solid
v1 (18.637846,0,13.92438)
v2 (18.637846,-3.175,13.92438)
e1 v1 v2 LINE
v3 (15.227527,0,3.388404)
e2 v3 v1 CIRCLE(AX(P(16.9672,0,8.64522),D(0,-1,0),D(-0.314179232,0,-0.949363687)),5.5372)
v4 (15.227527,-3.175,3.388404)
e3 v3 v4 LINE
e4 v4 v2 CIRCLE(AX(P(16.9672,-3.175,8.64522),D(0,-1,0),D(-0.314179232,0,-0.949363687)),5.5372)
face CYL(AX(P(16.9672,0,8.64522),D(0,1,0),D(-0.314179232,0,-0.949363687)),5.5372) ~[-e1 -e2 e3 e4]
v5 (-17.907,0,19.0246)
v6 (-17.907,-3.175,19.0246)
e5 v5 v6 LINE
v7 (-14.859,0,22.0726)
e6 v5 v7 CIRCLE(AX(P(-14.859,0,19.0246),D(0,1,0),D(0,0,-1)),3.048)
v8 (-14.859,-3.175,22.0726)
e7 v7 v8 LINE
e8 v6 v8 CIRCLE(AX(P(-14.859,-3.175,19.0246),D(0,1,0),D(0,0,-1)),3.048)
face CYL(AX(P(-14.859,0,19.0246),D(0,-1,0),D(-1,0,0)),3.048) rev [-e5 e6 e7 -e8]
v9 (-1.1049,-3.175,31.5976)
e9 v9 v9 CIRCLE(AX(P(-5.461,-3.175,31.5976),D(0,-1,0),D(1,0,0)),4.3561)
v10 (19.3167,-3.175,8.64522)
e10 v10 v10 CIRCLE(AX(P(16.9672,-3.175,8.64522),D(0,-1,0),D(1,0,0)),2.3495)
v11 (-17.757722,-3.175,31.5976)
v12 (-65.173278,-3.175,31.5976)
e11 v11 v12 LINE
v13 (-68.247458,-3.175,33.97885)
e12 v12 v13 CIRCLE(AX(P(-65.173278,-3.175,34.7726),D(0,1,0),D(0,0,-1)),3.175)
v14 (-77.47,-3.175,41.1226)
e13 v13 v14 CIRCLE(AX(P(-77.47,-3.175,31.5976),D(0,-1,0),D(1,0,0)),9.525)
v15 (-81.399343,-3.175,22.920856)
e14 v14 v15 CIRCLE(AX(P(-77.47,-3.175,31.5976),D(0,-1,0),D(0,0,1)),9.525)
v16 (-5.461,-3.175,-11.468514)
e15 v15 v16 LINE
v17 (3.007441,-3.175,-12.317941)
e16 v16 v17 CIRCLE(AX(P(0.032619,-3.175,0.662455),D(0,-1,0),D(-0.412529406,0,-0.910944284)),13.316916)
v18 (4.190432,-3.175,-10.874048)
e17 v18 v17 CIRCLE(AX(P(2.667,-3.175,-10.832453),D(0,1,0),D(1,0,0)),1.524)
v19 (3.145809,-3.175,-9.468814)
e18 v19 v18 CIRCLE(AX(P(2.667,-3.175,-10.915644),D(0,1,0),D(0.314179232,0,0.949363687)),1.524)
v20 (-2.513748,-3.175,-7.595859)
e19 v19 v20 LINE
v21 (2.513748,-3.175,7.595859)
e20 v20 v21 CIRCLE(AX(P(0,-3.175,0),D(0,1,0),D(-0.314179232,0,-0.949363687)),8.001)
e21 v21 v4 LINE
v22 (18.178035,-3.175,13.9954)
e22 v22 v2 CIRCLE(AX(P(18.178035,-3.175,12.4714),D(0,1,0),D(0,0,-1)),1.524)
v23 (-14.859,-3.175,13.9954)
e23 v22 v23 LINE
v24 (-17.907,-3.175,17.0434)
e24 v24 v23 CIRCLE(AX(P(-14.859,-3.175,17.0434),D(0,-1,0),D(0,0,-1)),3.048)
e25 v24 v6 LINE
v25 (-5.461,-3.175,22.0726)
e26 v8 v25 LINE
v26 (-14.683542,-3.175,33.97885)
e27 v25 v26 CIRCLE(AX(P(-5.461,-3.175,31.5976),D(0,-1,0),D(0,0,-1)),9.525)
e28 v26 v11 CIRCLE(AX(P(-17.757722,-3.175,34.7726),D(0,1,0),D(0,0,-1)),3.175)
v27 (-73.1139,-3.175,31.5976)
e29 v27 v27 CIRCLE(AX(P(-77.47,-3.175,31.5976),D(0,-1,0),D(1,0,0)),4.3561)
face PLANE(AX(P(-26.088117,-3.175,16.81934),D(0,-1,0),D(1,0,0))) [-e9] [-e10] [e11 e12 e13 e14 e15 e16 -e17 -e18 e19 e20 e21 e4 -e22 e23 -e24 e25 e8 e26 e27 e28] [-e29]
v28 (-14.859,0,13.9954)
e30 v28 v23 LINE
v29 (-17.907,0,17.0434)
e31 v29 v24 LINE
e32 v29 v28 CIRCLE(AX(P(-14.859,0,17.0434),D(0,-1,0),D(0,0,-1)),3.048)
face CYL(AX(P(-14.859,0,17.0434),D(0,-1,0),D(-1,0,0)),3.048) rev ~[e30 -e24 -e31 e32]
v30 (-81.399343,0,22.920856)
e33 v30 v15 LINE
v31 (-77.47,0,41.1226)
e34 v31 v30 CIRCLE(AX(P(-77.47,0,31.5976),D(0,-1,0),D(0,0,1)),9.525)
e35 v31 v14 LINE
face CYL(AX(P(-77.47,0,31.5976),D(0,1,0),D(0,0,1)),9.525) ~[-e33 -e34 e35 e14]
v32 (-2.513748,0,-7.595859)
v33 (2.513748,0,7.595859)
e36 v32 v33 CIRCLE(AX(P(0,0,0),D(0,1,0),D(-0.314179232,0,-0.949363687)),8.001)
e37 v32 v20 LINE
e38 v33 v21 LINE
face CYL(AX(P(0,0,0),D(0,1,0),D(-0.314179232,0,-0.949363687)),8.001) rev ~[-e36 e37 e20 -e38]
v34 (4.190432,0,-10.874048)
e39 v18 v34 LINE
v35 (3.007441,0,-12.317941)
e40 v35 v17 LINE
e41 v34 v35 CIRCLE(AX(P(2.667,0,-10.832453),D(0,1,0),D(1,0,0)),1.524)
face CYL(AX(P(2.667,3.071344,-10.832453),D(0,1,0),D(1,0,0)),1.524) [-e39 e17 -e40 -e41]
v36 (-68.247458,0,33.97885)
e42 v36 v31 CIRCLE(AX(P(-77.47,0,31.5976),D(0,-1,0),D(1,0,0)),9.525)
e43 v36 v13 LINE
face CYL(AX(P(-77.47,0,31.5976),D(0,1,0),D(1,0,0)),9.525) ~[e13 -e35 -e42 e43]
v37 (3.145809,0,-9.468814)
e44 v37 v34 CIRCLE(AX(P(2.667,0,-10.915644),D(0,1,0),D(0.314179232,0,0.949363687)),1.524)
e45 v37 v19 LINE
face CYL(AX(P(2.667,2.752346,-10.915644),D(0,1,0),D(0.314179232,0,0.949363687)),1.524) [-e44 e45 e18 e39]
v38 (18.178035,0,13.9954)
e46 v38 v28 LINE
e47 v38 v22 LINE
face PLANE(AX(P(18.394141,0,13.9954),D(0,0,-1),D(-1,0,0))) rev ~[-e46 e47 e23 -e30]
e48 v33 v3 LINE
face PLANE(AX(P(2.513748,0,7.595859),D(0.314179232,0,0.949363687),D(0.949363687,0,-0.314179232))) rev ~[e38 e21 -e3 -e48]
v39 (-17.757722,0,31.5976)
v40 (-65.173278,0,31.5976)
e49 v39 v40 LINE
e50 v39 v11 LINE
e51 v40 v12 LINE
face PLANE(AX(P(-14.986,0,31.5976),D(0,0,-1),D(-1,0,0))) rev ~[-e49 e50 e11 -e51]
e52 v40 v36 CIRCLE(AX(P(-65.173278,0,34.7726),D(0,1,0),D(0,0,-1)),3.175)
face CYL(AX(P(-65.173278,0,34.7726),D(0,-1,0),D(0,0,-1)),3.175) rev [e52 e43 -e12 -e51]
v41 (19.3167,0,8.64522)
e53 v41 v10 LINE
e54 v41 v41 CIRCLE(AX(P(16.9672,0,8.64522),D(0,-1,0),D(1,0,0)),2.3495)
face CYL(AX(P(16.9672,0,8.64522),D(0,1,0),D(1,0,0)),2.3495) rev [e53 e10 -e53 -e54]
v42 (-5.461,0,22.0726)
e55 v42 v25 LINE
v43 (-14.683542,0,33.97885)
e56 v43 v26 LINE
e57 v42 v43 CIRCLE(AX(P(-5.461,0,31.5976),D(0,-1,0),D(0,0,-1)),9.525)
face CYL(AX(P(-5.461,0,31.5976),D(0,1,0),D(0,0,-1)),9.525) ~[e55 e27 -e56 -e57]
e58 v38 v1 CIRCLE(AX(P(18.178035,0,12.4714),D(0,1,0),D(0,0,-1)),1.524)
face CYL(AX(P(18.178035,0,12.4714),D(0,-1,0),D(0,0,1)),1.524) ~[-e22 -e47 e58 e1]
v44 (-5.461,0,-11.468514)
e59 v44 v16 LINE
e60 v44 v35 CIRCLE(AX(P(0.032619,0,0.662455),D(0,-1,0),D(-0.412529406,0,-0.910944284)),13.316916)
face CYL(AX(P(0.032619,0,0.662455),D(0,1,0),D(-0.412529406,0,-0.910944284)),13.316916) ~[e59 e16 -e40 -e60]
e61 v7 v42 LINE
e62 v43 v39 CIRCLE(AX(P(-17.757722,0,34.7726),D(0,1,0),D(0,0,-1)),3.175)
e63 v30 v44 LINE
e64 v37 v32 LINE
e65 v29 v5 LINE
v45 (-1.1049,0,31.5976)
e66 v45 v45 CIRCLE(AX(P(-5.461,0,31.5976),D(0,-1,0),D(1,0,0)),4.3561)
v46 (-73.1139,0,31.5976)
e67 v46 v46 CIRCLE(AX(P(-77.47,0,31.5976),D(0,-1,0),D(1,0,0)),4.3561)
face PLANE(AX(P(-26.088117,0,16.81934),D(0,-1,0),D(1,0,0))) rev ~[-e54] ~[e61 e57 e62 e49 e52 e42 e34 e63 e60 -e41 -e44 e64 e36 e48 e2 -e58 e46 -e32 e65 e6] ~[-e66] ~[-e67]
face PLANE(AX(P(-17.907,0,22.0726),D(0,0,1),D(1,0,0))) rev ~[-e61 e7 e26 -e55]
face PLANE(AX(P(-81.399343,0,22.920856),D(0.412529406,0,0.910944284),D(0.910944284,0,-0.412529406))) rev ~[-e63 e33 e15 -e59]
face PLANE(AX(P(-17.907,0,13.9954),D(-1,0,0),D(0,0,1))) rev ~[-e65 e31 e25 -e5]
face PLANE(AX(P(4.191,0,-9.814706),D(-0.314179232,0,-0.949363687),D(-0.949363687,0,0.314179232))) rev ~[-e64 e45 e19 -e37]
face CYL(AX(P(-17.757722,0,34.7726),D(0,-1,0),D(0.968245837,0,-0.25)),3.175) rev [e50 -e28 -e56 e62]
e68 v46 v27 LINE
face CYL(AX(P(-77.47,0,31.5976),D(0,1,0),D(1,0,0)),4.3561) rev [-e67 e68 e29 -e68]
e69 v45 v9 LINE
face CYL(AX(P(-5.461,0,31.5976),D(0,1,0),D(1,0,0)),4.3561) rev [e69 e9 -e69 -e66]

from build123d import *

# Parameters (mm, degrees)
F0_R        = 2.3495
F0_R_2      = 4.3561
F1_DEPTH    = 3.175
F2_T1_DEPTH = 8.6796915338
F2_T3_DEPTH = 9.317688033
F3_R        = 3.048
F4_R        = 3.175
F5_R        = 1.524


# Not quite as in the source:
# - a fillet or chamfer that OpenCascade refuses, or shapes differently, is made with other operations: its cross-section is extruded or revolved along the edge and cut away or added


with BuildPart() as f1:
    # F0 (on Front) → F1 (new body)
    with BuildSketch(Plane.XZ):
        with BuildLine():
            Line((-17.907, 13.9954), (-17.907, 22.0726))
            Line((-17.907, 22.0726), (-5.461, 22.0726))
            ThreePointArc((-5.461, 22.0726), (4.064, 31.5976), (-5.461, 41.1226))
            ThreePointArc((-5.461, 41.1226), (-12.1961920908, 38.3327920908), (-14.986, 31.5976))
            Line((-14.986, 31.5976), (-67.945, 31.5976))
            ThreePointArc((-67.945, 31.5976), (-70.7348079092, 38.3327920908), (-77.47, 41.1226))
            ThreePointArc((-77.47, 41.1226), (-86.7805213206, 33.6075297847), (-81.3993425959, 22.9208556933))
            Line((-81.3993425959, 22.9208556933), (-5.461, -11.4685135998))
            ThreePointArc((-5.461, -11.4685135998), (-0.6838491315, -12.6351736228), (4.191, -11.9885578365))
            Line((4.191, -11.9885578365), (4.191, -9.8147056722))
            Line((4.191, -9.8147056722), (-2.5137480378, -7.5958588588))
            ThreePointArc((-2.5137480378, -7.5958588588), (-7.5958588588, 2.5137480378), (2.5137480378, 7.5958588588))
            Line((2.5137480378, 7.5958588588), (15.2275267548, 3.3884035996))
            ThreePointArc((15.2275267548, 3.3884035996), (22.2730028192, 7.0612251677), (18.3941407903, 13.9954))
            Line((18.3941407903, 13.9954), (-17.907, 13.9954))
        make_face()
        with Locations((16.9672, 8.6452202067)):
            Circle(F0_R, mode=Mode.SUBTRACT)
        with Locations((-77.47, 31.5976)):
            Circle(F0_R_2, mode=Mode.SUBTRACT)
        with Locations((-5.461, 31.5976)):
            Circle(F0_R_2, mode=Mode.SUBTRACT)
    extrude(amount=F1_DEPTH)

    # F2: fillet of radius 1.524 on 2 edges, made by hand

    # F2_s2 → F2_t1 (cut)
    with BuildSketch(Plane.XZ.offset(-2.7523457669)):
        with BuildLine():
            ThreePointArc((3.1458091501, -9.4688137202), (3.9023706215, -10.0232116691), (4.191, -10.915643979))
            Line((4.191, -10.915643979), (4.191, -9.8147056722))
            Line((4.191, -9.8147056722), (3.1458091501, -9.4688137202))
        make_face()
    extrude(amount=F2_T1_DEPTH, mode=Mode.SUBTRACT)

    # F2_s4 → F2_t3 (cut)
    with BuildSketch(Plane.XZ.offset(-3.0713440165)):
        with BuildLine():
            ThreePointArc((4.191, -10.8324529742), (3.8589330034, -11.7821222406), (3.0074413182, -12.3179413481))
            ThreePointArc((3.0074413182, -12.3179413481), (3.6030210464, -12.1669053498), (4.191, -11.9885578365))
            Line((4.191, -11.9885578365), (4.191, -10.8324529742))
        make_face()
    extrude(amount=F2_T3_DEPTH, mode=Mode.SUBTRACT)

    # F3
    f3_edges = [f1.edges().sort_by_distance(p)[0] for p in [
        (-17.907, -1.5875, 22.0726),
        (-17.907, -1.5875, 13.9954),
    ]]
    fillet(f3_edges, radius=F3_R)

    # F4
    f4_edges = [f1.edges().sort_by_distance(p)[0] for p in [
        (-67.945, -1.5875, 31.5976),
        (-14.986, -1.5875, 31.5976),
    ]]
    fillet(f4_edges, radius=F4_R)

    # F5
    f5_edges = [f1.edges().sort_by_distance(p)[0] for p in [
        (18.394141, -1.5875, 13.9954),
    ]]
    fillet(f5_edges, radius=F5_R)


solid = f1.part
